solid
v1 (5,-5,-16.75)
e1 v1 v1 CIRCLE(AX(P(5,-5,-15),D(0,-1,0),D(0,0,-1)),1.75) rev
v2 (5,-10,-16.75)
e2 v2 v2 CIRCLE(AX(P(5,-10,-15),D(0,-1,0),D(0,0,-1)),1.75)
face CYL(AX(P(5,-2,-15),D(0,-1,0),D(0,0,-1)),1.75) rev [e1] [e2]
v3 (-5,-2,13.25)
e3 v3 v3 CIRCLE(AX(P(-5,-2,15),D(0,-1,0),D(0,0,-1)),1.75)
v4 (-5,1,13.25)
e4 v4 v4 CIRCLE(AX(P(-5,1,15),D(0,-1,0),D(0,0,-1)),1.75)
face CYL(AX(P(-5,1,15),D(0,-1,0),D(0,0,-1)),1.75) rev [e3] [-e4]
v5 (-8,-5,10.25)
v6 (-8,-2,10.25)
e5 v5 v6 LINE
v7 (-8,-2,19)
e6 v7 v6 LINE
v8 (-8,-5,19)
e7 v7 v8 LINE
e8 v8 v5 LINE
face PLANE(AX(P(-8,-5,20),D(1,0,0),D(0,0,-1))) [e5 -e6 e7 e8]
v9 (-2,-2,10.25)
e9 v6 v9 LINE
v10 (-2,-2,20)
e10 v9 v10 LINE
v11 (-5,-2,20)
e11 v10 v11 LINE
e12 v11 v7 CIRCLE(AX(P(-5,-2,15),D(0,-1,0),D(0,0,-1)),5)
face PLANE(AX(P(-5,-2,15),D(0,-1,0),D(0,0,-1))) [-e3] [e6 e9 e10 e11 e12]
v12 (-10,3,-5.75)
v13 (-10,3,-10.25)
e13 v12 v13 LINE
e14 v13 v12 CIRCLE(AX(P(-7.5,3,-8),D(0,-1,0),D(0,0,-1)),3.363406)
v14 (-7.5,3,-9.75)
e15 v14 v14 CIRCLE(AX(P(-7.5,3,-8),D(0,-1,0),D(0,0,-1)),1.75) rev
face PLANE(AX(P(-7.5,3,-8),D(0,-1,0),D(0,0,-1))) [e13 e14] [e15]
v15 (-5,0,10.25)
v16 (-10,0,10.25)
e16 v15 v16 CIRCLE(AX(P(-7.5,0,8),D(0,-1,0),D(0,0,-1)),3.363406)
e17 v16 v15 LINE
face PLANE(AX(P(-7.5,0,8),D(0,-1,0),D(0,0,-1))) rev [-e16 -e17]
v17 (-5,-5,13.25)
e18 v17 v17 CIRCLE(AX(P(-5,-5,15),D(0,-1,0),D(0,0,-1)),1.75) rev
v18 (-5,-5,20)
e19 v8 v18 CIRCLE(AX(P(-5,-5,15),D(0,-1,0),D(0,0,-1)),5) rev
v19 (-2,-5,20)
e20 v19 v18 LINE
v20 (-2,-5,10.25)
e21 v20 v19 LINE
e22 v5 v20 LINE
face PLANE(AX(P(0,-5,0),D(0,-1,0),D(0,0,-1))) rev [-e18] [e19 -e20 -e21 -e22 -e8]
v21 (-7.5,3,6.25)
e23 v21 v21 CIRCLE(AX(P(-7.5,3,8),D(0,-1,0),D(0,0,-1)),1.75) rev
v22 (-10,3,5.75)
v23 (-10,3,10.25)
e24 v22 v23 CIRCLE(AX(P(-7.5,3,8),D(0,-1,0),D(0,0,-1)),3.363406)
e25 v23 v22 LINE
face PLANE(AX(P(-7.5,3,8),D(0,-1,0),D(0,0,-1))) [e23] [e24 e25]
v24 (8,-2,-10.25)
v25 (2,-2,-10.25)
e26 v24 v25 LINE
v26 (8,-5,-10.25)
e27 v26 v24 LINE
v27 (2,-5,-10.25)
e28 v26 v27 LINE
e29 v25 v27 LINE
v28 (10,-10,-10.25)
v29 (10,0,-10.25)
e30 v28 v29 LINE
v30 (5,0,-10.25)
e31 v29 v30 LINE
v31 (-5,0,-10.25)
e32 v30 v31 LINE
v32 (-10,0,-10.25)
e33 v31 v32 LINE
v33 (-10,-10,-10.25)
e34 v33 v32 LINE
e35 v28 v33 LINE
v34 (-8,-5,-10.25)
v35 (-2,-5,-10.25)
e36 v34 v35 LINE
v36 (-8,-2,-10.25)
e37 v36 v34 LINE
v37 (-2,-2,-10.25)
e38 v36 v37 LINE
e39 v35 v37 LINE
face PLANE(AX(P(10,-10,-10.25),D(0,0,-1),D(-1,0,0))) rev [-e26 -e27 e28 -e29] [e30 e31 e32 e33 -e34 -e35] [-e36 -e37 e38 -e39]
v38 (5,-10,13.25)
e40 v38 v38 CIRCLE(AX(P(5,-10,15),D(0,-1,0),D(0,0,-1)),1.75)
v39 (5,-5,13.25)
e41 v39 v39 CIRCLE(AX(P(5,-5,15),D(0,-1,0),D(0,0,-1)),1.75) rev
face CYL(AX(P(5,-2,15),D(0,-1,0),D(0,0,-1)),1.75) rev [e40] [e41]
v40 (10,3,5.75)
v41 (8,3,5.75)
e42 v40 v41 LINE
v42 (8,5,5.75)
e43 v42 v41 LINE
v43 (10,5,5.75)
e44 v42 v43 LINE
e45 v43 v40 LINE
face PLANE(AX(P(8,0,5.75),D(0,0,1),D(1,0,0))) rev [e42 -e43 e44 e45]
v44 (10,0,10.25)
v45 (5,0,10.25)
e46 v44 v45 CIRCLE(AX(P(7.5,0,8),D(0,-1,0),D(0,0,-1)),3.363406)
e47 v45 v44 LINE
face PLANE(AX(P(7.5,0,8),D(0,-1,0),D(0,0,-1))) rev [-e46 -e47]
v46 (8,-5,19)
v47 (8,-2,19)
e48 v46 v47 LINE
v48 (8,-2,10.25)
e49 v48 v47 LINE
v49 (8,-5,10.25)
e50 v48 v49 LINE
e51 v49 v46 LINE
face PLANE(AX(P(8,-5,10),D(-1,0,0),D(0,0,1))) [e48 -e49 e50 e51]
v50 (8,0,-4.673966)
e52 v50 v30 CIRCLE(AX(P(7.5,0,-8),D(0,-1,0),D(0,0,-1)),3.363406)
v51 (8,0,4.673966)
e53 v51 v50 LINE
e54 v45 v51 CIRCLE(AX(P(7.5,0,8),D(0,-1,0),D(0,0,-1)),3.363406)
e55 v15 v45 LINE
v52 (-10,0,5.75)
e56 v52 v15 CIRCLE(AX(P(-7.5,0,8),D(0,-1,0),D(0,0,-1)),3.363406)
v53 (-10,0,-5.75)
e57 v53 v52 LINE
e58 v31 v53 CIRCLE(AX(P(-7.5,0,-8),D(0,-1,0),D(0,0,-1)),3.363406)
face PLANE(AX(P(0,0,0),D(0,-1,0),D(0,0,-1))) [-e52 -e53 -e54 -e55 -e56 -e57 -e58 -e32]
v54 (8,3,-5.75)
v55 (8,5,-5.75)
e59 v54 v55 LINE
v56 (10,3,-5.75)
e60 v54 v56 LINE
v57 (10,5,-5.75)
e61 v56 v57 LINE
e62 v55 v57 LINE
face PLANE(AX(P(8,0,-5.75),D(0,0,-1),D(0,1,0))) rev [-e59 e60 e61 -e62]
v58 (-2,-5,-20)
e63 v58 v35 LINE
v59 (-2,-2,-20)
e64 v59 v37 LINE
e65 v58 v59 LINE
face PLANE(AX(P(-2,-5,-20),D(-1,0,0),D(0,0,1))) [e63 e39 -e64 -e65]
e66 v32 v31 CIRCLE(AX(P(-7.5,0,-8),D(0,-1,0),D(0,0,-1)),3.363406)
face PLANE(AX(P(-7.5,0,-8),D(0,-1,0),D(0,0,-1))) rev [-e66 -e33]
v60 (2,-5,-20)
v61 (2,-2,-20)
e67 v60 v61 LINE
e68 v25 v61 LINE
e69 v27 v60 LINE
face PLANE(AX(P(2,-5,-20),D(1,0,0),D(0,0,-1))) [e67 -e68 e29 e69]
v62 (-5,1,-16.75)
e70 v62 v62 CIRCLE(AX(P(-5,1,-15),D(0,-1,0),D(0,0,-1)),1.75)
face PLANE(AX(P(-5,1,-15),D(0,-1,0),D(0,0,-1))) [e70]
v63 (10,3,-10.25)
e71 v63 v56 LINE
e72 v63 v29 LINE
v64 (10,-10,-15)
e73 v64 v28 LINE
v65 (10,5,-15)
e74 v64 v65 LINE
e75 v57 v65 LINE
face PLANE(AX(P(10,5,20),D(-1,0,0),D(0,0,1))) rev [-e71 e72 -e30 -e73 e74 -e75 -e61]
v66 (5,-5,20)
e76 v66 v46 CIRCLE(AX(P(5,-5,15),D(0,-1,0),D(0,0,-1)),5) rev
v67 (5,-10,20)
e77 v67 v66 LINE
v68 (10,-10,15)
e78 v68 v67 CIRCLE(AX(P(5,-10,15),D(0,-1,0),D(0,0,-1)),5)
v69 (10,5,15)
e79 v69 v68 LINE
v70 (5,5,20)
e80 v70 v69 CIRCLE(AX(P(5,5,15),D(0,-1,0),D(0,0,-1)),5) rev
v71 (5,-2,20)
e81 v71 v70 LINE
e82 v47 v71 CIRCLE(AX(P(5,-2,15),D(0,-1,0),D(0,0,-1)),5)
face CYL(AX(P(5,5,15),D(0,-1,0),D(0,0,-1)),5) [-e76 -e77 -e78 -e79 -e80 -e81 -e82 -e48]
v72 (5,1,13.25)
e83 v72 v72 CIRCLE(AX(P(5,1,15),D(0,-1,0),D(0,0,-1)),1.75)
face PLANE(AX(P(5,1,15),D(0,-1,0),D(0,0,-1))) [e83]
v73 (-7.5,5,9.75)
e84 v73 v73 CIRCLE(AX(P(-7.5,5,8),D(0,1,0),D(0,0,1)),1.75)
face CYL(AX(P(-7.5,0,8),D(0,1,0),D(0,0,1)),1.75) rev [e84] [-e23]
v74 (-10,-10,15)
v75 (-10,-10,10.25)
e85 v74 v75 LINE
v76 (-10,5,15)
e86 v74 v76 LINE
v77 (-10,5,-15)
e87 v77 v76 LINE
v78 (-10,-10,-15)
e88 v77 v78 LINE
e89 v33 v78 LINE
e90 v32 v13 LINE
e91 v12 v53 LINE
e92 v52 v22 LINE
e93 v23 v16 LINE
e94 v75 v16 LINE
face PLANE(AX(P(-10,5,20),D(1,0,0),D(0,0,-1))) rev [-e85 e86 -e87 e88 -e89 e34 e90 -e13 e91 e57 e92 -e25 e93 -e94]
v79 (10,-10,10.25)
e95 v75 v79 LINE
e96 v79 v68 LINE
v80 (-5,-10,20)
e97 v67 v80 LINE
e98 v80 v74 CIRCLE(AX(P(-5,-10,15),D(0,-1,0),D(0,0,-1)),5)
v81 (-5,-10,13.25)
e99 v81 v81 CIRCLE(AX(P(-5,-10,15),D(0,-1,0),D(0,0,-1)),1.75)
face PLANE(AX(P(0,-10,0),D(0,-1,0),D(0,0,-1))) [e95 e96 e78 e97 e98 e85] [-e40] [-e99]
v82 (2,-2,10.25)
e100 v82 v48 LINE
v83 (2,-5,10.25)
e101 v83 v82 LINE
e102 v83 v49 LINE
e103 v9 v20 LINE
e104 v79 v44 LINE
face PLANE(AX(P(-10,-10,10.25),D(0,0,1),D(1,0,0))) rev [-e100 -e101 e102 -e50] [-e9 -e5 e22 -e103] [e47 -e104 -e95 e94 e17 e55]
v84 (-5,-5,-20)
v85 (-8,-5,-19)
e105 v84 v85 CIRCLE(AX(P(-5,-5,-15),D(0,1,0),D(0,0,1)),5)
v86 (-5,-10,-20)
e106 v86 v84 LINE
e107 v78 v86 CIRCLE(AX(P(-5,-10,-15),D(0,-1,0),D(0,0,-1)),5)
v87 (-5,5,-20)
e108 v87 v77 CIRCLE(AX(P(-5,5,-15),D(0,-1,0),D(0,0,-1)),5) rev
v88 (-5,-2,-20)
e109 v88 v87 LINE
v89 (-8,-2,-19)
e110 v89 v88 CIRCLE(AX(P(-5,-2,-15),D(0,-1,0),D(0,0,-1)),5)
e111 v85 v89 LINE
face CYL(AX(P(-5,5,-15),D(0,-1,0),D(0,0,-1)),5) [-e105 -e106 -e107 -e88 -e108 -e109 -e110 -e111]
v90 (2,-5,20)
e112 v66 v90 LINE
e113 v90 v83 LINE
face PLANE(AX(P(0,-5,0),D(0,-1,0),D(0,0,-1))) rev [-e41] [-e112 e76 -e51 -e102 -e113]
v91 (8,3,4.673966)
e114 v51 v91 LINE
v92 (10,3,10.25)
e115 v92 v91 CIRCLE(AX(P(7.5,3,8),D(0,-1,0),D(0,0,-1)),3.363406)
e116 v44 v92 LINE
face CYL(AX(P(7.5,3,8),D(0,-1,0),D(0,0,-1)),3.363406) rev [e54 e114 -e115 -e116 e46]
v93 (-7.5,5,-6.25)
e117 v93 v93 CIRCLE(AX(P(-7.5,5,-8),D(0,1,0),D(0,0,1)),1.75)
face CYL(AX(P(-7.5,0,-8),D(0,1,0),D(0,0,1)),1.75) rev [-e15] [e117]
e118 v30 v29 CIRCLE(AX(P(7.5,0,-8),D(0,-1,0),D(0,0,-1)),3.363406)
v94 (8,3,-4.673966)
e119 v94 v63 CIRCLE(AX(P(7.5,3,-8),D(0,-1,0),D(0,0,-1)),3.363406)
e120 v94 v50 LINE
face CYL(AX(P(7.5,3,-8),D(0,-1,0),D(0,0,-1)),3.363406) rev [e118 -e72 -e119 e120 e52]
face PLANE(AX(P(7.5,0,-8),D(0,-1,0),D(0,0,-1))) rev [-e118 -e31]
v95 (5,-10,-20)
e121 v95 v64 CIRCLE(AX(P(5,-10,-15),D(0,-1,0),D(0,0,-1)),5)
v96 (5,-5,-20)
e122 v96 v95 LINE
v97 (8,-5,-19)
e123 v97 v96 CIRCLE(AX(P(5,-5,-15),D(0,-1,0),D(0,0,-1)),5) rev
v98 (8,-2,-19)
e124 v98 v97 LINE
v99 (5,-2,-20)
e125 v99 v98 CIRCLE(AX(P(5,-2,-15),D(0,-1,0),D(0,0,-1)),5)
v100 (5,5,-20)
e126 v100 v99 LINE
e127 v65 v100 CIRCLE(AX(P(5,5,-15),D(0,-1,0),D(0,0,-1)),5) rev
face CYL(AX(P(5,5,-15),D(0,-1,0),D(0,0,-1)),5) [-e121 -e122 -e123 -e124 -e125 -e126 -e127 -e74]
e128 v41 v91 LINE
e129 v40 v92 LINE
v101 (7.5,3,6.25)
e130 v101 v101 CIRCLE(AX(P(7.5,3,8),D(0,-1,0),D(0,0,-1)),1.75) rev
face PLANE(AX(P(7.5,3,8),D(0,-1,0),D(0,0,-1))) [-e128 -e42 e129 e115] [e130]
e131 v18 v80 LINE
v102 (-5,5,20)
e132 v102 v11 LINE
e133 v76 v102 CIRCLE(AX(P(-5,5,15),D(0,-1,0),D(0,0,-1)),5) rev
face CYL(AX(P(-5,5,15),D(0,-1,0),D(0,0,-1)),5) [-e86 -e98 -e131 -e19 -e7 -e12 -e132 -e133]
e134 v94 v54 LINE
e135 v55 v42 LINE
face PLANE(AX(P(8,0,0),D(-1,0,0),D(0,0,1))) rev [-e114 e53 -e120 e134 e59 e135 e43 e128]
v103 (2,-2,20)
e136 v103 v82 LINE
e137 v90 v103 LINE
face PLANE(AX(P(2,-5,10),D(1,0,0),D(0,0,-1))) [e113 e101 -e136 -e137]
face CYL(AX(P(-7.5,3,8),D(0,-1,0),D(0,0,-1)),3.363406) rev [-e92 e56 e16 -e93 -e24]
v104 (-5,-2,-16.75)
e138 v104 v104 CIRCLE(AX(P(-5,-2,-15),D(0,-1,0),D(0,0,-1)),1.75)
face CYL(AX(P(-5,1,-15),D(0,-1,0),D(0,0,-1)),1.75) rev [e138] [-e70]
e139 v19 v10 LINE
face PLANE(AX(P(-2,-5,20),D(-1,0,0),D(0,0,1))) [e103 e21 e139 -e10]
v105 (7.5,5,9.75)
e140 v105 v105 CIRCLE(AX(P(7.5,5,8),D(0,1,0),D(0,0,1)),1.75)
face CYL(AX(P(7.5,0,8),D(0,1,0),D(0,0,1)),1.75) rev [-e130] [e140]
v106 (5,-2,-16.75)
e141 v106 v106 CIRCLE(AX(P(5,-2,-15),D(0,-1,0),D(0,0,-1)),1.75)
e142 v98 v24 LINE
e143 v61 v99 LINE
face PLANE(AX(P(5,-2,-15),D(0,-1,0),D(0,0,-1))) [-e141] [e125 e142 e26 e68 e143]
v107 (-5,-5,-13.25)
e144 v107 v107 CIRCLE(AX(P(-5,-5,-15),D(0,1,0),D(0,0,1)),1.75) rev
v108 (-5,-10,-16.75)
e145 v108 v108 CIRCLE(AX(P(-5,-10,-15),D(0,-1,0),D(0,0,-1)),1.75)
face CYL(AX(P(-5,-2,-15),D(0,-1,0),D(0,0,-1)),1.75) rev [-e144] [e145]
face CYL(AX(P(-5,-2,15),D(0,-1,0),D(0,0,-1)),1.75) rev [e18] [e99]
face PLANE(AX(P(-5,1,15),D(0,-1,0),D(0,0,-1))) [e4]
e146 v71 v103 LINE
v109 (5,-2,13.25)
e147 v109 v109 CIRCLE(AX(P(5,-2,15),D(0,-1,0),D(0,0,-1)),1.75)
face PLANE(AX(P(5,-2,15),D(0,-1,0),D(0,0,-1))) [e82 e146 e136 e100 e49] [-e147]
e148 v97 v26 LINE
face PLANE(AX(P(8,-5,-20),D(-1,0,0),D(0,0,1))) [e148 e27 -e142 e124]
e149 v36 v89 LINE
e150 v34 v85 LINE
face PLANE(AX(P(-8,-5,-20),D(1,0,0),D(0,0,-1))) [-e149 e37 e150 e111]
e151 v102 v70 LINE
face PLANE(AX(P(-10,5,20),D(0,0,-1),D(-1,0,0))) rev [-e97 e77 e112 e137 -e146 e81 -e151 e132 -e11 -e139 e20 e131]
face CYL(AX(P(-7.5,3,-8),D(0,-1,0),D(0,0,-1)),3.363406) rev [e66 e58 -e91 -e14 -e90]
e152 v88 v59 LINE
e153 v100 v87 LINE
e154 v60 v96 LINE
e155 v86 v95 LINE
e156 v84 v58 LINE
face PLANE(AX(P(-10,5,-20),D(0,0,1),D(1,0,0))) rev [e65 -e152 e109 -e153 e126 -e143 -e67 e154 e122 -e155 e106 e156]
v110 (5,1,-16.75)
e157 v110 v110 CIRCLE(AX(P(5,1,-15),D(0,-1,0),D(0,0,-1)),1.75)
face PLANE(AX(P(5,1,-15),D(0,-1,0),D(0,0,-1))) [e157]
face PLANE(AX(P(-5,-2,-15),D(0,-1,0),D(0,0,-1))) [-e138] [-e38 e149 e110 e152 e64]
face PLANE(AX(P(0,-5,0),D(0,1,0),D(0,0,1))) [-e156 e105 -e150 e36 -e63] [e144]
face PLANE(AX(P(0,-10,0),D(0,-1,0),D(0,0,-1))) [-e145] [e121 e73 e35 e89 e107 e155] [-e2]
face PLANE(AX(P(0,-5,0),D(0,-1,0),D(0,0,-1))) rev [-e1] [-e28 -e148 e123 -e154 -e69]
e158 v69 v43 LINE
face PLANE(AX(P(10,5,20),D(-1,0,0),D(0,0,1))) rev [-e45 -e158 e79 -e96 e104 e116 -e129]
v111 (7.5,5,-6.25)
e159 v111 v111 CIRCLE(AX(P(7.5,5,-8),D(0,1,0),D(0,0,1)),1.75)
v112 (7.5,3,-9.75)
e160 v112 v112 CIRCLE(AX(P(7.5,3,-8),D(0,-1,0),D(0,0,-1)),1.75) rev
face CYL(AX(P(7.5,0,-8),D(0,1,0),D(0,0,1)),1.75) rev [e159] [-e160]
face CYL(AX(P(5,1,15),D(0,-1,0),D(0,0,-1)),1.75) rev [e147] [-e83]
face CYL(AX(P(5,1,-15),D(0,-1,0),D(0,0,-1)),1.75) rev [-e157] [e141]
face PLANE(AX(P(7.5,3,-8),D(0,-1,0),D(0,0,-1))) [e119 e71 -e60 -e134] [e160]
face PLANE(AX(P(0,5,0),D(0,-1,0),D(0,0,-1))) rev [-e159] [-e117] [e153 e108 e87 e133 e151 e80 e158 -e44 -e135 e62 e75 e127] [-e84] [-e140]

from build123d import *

# Parameters (mm, degrees)
SKETCH1_W           = 20
SKETCH1_H           = 40
BOSS_EXTRUDE1_DEPTH = 5
SKETCH2_W           = 20
SKETCH2_H           = 9.75
BOSS_EXTRUDE2_DEPTH = 10
SKETCH3_R           = 1.75
CUT_EXTRUDE1_DEPTH  = 5
SKETCH4_R           = 3.363406012
CUT_EXTRUDE2_DEPTH  = 3
SKETCH5_R           = 1.75
CUT_EXTRUDE3_DEPTH  = 8
SKETCH6_W           = 6
SKETCH6_H           = 10
CUT_EXTRUDE4_DEPTH  = 3
SKETCH7_R           = 1.75
CUT_EXTRUDE5_DEPTH  = 3
FILLET1_R           = 5
SKETCH10_W          = 11.5
SKETCH10_H          = 5
CUT_EXTRUDE6_DEPTH  = 2


with BuildPart() as part:
    # Sketch1 → Boss-Extrude1 (new body)
    with BuildSketch(Plane(origin=(0, 0, 0), x_dir=(1, 0, 0), z_dir=(0, 1, 0))):
        Rectangle(SKETCH1_W, SKETCH1_H)
    extrude(amount=BOSS_EXTRUDE1_DEPTH)

    # Sketch2 → Boss-Extrude2 (add)
    with BuildSketch(Plane.XZ):
        with Locations((0, 15.125)):
            Rectangle(SKETCH2_W, SKETCH2_H)
        with Locations((0, -15.125)):
            Rectangle(SKETCH2_W, SKETCH2_H)
    extrude(amount=BOSS_EXTRUDE2_DEPTH)

    # Sketch3 → Cut-Extrude1 (cut)
    with BuildSketch(Plane(origin=(0, 5, 0), x_dir=(1, 0, 0), z_dir=(0, 1, 0))):
        with Locations(Location((-7.5, -8, 0), (0, 0, 270))):
            Circle(SKETCH3_R)
        with Locations(Location((-7.5, 8, 0), (0, 0, 270))):
            Circle(SKETCH3_R)
        with Locations(Location((7.5, -8, 0), (0, 0, 270))):
            Circle(SKETCH3_R)
        with Locations(Location((7.5, 8, 0), (0, 0, 270))):
            Circle(SKETCH3_R)
    extrude(amount=-CUT_EXTRUDE1_DEPTH, mode=Mode.SUBTRACT)

    # Sketch4 → Cut-Extrude2 (cut)
    with BuildSketch(Plane.XZ):
        with Locations((7.5, 8)):
            Circle(SKETCH4_R)
        with Locations((-7.5, 8)):
            Circle(SKETCH4_R)
        with Locations((-7.5, -8)):
            Circle(SKETCH4_R)
        with Locations((7.5, -8)):
            Circle(SKETCH4_R)
    extrude(amount=-CUT_EXTRUDE2_DEPTH, mode=Mode.SUBTRACT)

    # Sketch5 → Cut-Extrude3 (cut)
    with BuildSketch(Plane.XZ.offset(10)):
        with Locations(Location((-5, -15, 0), (0, 0, 270))):
            Circle(SKETCH5_R)
        with Locations(Location((5, -15, 0), (0, 0, 270))):
            Circle(SKETCH5_R)
        with Locations(Location((-5, 15, 0), (0, 0, 270))):
            Circle(SKETCH5_R)
        with Locations(Location((5, 15, 0), (0, 0, 270))):
            Circle(SKETCH5_R)
    extrude(amount=-CUT_EXTRUDE3_DEPTH, mode=Mode.SUBTRACT)

    # Sketch6 → Cut-Extrude4 (cut)
    with BuildSketch(Plane.XZ.offset(2)):
        with Locations((-5, -15)):
            Rectangle(SKETCH6_W, SKETCH6_H)
        with Locations((5, -15)):
            Rectangle(SKETCH6_W, SKETCH6_H)
        with Locations((5, 15)):
            Rectangle(SKETCH6_W, SKETCH6_H)
        with Locations((-5, 15)):
            Rectangle(SKETCH6_W, SKETCH6_H)
    extrude(amount=CUT_EXTRUDE4_DEPTH, mode=Mode.SUBTRACT)

    # Sketch7 → Cut-Extrude5 (cut)
    with BuildSketch(Plane.XZ.offset(2)):
        with Locations(Location((-5, -15, 0), (0, 0, 270))):
            Circle(SKETCH7_R)
        with Locations(Location((5, -15, 0), (0, 0, 270))):
            Circle(SKETCH7_R)
        with Locations(Location((5, 15, 0), (0, 0, 270))):
            Circle(SKETCH7_R)
        with Locations(Location((-5, 15, 0), (0, 0, 270))):
            Circle(SKETCH7_R)
    extrude(amount=-CUT_EXTRUDE5_DEPTH, mode=Mode.SUBTRACT)

    # Fillet1
    # the kernel refuses this fillet: 5 mm, written as the material it takes off along each edge
    with BuildSketch(Plane(origin=(-10, 17.5, -20), x_dir=(0, 0, 1), z_dir=(0, -1, 0)), Plane(origin=(10, -22.5, -20), x_dir=(0, 0, 1), z_dir=(0, 1, 0)), Plane(origin=(-10, 17.5, 20), x_dir=(1, 0, 0), z_dir=(0, -1, 0)), Plane(origin=(10, -22.5, 20), x_dir=(-1, 0, 0), z_dir=(0, 1, 0))) as fillet1_piece_1:
        with BuildLine():
            CenterArc((FILLET1_R, -FILLET1_R), FILLET1_R, 90, 90)
            Line((0, -FILLET1_R), (0, 0))
            Line((0, 0), (FILLET1_R, 0))
        make_face()
    extrude(amount=40, mode=Mode.SUBTRACT)

    # Sketch10 → Cut-Extrude6 (cut)
    with BuildSketch(Plane(origin=(10, 0, 0), x_dir=(0, 0, -1), z_dir=(1, 0, 0))):
        with Locations((0, 2.5)):
            Rectangle(SKETCH10_W, SKETCH10_H)
    extrude(amount=-CUT_EXTRUDE6_DEPTH, mode=Mode.SUBTRACT)


solid = part.part
